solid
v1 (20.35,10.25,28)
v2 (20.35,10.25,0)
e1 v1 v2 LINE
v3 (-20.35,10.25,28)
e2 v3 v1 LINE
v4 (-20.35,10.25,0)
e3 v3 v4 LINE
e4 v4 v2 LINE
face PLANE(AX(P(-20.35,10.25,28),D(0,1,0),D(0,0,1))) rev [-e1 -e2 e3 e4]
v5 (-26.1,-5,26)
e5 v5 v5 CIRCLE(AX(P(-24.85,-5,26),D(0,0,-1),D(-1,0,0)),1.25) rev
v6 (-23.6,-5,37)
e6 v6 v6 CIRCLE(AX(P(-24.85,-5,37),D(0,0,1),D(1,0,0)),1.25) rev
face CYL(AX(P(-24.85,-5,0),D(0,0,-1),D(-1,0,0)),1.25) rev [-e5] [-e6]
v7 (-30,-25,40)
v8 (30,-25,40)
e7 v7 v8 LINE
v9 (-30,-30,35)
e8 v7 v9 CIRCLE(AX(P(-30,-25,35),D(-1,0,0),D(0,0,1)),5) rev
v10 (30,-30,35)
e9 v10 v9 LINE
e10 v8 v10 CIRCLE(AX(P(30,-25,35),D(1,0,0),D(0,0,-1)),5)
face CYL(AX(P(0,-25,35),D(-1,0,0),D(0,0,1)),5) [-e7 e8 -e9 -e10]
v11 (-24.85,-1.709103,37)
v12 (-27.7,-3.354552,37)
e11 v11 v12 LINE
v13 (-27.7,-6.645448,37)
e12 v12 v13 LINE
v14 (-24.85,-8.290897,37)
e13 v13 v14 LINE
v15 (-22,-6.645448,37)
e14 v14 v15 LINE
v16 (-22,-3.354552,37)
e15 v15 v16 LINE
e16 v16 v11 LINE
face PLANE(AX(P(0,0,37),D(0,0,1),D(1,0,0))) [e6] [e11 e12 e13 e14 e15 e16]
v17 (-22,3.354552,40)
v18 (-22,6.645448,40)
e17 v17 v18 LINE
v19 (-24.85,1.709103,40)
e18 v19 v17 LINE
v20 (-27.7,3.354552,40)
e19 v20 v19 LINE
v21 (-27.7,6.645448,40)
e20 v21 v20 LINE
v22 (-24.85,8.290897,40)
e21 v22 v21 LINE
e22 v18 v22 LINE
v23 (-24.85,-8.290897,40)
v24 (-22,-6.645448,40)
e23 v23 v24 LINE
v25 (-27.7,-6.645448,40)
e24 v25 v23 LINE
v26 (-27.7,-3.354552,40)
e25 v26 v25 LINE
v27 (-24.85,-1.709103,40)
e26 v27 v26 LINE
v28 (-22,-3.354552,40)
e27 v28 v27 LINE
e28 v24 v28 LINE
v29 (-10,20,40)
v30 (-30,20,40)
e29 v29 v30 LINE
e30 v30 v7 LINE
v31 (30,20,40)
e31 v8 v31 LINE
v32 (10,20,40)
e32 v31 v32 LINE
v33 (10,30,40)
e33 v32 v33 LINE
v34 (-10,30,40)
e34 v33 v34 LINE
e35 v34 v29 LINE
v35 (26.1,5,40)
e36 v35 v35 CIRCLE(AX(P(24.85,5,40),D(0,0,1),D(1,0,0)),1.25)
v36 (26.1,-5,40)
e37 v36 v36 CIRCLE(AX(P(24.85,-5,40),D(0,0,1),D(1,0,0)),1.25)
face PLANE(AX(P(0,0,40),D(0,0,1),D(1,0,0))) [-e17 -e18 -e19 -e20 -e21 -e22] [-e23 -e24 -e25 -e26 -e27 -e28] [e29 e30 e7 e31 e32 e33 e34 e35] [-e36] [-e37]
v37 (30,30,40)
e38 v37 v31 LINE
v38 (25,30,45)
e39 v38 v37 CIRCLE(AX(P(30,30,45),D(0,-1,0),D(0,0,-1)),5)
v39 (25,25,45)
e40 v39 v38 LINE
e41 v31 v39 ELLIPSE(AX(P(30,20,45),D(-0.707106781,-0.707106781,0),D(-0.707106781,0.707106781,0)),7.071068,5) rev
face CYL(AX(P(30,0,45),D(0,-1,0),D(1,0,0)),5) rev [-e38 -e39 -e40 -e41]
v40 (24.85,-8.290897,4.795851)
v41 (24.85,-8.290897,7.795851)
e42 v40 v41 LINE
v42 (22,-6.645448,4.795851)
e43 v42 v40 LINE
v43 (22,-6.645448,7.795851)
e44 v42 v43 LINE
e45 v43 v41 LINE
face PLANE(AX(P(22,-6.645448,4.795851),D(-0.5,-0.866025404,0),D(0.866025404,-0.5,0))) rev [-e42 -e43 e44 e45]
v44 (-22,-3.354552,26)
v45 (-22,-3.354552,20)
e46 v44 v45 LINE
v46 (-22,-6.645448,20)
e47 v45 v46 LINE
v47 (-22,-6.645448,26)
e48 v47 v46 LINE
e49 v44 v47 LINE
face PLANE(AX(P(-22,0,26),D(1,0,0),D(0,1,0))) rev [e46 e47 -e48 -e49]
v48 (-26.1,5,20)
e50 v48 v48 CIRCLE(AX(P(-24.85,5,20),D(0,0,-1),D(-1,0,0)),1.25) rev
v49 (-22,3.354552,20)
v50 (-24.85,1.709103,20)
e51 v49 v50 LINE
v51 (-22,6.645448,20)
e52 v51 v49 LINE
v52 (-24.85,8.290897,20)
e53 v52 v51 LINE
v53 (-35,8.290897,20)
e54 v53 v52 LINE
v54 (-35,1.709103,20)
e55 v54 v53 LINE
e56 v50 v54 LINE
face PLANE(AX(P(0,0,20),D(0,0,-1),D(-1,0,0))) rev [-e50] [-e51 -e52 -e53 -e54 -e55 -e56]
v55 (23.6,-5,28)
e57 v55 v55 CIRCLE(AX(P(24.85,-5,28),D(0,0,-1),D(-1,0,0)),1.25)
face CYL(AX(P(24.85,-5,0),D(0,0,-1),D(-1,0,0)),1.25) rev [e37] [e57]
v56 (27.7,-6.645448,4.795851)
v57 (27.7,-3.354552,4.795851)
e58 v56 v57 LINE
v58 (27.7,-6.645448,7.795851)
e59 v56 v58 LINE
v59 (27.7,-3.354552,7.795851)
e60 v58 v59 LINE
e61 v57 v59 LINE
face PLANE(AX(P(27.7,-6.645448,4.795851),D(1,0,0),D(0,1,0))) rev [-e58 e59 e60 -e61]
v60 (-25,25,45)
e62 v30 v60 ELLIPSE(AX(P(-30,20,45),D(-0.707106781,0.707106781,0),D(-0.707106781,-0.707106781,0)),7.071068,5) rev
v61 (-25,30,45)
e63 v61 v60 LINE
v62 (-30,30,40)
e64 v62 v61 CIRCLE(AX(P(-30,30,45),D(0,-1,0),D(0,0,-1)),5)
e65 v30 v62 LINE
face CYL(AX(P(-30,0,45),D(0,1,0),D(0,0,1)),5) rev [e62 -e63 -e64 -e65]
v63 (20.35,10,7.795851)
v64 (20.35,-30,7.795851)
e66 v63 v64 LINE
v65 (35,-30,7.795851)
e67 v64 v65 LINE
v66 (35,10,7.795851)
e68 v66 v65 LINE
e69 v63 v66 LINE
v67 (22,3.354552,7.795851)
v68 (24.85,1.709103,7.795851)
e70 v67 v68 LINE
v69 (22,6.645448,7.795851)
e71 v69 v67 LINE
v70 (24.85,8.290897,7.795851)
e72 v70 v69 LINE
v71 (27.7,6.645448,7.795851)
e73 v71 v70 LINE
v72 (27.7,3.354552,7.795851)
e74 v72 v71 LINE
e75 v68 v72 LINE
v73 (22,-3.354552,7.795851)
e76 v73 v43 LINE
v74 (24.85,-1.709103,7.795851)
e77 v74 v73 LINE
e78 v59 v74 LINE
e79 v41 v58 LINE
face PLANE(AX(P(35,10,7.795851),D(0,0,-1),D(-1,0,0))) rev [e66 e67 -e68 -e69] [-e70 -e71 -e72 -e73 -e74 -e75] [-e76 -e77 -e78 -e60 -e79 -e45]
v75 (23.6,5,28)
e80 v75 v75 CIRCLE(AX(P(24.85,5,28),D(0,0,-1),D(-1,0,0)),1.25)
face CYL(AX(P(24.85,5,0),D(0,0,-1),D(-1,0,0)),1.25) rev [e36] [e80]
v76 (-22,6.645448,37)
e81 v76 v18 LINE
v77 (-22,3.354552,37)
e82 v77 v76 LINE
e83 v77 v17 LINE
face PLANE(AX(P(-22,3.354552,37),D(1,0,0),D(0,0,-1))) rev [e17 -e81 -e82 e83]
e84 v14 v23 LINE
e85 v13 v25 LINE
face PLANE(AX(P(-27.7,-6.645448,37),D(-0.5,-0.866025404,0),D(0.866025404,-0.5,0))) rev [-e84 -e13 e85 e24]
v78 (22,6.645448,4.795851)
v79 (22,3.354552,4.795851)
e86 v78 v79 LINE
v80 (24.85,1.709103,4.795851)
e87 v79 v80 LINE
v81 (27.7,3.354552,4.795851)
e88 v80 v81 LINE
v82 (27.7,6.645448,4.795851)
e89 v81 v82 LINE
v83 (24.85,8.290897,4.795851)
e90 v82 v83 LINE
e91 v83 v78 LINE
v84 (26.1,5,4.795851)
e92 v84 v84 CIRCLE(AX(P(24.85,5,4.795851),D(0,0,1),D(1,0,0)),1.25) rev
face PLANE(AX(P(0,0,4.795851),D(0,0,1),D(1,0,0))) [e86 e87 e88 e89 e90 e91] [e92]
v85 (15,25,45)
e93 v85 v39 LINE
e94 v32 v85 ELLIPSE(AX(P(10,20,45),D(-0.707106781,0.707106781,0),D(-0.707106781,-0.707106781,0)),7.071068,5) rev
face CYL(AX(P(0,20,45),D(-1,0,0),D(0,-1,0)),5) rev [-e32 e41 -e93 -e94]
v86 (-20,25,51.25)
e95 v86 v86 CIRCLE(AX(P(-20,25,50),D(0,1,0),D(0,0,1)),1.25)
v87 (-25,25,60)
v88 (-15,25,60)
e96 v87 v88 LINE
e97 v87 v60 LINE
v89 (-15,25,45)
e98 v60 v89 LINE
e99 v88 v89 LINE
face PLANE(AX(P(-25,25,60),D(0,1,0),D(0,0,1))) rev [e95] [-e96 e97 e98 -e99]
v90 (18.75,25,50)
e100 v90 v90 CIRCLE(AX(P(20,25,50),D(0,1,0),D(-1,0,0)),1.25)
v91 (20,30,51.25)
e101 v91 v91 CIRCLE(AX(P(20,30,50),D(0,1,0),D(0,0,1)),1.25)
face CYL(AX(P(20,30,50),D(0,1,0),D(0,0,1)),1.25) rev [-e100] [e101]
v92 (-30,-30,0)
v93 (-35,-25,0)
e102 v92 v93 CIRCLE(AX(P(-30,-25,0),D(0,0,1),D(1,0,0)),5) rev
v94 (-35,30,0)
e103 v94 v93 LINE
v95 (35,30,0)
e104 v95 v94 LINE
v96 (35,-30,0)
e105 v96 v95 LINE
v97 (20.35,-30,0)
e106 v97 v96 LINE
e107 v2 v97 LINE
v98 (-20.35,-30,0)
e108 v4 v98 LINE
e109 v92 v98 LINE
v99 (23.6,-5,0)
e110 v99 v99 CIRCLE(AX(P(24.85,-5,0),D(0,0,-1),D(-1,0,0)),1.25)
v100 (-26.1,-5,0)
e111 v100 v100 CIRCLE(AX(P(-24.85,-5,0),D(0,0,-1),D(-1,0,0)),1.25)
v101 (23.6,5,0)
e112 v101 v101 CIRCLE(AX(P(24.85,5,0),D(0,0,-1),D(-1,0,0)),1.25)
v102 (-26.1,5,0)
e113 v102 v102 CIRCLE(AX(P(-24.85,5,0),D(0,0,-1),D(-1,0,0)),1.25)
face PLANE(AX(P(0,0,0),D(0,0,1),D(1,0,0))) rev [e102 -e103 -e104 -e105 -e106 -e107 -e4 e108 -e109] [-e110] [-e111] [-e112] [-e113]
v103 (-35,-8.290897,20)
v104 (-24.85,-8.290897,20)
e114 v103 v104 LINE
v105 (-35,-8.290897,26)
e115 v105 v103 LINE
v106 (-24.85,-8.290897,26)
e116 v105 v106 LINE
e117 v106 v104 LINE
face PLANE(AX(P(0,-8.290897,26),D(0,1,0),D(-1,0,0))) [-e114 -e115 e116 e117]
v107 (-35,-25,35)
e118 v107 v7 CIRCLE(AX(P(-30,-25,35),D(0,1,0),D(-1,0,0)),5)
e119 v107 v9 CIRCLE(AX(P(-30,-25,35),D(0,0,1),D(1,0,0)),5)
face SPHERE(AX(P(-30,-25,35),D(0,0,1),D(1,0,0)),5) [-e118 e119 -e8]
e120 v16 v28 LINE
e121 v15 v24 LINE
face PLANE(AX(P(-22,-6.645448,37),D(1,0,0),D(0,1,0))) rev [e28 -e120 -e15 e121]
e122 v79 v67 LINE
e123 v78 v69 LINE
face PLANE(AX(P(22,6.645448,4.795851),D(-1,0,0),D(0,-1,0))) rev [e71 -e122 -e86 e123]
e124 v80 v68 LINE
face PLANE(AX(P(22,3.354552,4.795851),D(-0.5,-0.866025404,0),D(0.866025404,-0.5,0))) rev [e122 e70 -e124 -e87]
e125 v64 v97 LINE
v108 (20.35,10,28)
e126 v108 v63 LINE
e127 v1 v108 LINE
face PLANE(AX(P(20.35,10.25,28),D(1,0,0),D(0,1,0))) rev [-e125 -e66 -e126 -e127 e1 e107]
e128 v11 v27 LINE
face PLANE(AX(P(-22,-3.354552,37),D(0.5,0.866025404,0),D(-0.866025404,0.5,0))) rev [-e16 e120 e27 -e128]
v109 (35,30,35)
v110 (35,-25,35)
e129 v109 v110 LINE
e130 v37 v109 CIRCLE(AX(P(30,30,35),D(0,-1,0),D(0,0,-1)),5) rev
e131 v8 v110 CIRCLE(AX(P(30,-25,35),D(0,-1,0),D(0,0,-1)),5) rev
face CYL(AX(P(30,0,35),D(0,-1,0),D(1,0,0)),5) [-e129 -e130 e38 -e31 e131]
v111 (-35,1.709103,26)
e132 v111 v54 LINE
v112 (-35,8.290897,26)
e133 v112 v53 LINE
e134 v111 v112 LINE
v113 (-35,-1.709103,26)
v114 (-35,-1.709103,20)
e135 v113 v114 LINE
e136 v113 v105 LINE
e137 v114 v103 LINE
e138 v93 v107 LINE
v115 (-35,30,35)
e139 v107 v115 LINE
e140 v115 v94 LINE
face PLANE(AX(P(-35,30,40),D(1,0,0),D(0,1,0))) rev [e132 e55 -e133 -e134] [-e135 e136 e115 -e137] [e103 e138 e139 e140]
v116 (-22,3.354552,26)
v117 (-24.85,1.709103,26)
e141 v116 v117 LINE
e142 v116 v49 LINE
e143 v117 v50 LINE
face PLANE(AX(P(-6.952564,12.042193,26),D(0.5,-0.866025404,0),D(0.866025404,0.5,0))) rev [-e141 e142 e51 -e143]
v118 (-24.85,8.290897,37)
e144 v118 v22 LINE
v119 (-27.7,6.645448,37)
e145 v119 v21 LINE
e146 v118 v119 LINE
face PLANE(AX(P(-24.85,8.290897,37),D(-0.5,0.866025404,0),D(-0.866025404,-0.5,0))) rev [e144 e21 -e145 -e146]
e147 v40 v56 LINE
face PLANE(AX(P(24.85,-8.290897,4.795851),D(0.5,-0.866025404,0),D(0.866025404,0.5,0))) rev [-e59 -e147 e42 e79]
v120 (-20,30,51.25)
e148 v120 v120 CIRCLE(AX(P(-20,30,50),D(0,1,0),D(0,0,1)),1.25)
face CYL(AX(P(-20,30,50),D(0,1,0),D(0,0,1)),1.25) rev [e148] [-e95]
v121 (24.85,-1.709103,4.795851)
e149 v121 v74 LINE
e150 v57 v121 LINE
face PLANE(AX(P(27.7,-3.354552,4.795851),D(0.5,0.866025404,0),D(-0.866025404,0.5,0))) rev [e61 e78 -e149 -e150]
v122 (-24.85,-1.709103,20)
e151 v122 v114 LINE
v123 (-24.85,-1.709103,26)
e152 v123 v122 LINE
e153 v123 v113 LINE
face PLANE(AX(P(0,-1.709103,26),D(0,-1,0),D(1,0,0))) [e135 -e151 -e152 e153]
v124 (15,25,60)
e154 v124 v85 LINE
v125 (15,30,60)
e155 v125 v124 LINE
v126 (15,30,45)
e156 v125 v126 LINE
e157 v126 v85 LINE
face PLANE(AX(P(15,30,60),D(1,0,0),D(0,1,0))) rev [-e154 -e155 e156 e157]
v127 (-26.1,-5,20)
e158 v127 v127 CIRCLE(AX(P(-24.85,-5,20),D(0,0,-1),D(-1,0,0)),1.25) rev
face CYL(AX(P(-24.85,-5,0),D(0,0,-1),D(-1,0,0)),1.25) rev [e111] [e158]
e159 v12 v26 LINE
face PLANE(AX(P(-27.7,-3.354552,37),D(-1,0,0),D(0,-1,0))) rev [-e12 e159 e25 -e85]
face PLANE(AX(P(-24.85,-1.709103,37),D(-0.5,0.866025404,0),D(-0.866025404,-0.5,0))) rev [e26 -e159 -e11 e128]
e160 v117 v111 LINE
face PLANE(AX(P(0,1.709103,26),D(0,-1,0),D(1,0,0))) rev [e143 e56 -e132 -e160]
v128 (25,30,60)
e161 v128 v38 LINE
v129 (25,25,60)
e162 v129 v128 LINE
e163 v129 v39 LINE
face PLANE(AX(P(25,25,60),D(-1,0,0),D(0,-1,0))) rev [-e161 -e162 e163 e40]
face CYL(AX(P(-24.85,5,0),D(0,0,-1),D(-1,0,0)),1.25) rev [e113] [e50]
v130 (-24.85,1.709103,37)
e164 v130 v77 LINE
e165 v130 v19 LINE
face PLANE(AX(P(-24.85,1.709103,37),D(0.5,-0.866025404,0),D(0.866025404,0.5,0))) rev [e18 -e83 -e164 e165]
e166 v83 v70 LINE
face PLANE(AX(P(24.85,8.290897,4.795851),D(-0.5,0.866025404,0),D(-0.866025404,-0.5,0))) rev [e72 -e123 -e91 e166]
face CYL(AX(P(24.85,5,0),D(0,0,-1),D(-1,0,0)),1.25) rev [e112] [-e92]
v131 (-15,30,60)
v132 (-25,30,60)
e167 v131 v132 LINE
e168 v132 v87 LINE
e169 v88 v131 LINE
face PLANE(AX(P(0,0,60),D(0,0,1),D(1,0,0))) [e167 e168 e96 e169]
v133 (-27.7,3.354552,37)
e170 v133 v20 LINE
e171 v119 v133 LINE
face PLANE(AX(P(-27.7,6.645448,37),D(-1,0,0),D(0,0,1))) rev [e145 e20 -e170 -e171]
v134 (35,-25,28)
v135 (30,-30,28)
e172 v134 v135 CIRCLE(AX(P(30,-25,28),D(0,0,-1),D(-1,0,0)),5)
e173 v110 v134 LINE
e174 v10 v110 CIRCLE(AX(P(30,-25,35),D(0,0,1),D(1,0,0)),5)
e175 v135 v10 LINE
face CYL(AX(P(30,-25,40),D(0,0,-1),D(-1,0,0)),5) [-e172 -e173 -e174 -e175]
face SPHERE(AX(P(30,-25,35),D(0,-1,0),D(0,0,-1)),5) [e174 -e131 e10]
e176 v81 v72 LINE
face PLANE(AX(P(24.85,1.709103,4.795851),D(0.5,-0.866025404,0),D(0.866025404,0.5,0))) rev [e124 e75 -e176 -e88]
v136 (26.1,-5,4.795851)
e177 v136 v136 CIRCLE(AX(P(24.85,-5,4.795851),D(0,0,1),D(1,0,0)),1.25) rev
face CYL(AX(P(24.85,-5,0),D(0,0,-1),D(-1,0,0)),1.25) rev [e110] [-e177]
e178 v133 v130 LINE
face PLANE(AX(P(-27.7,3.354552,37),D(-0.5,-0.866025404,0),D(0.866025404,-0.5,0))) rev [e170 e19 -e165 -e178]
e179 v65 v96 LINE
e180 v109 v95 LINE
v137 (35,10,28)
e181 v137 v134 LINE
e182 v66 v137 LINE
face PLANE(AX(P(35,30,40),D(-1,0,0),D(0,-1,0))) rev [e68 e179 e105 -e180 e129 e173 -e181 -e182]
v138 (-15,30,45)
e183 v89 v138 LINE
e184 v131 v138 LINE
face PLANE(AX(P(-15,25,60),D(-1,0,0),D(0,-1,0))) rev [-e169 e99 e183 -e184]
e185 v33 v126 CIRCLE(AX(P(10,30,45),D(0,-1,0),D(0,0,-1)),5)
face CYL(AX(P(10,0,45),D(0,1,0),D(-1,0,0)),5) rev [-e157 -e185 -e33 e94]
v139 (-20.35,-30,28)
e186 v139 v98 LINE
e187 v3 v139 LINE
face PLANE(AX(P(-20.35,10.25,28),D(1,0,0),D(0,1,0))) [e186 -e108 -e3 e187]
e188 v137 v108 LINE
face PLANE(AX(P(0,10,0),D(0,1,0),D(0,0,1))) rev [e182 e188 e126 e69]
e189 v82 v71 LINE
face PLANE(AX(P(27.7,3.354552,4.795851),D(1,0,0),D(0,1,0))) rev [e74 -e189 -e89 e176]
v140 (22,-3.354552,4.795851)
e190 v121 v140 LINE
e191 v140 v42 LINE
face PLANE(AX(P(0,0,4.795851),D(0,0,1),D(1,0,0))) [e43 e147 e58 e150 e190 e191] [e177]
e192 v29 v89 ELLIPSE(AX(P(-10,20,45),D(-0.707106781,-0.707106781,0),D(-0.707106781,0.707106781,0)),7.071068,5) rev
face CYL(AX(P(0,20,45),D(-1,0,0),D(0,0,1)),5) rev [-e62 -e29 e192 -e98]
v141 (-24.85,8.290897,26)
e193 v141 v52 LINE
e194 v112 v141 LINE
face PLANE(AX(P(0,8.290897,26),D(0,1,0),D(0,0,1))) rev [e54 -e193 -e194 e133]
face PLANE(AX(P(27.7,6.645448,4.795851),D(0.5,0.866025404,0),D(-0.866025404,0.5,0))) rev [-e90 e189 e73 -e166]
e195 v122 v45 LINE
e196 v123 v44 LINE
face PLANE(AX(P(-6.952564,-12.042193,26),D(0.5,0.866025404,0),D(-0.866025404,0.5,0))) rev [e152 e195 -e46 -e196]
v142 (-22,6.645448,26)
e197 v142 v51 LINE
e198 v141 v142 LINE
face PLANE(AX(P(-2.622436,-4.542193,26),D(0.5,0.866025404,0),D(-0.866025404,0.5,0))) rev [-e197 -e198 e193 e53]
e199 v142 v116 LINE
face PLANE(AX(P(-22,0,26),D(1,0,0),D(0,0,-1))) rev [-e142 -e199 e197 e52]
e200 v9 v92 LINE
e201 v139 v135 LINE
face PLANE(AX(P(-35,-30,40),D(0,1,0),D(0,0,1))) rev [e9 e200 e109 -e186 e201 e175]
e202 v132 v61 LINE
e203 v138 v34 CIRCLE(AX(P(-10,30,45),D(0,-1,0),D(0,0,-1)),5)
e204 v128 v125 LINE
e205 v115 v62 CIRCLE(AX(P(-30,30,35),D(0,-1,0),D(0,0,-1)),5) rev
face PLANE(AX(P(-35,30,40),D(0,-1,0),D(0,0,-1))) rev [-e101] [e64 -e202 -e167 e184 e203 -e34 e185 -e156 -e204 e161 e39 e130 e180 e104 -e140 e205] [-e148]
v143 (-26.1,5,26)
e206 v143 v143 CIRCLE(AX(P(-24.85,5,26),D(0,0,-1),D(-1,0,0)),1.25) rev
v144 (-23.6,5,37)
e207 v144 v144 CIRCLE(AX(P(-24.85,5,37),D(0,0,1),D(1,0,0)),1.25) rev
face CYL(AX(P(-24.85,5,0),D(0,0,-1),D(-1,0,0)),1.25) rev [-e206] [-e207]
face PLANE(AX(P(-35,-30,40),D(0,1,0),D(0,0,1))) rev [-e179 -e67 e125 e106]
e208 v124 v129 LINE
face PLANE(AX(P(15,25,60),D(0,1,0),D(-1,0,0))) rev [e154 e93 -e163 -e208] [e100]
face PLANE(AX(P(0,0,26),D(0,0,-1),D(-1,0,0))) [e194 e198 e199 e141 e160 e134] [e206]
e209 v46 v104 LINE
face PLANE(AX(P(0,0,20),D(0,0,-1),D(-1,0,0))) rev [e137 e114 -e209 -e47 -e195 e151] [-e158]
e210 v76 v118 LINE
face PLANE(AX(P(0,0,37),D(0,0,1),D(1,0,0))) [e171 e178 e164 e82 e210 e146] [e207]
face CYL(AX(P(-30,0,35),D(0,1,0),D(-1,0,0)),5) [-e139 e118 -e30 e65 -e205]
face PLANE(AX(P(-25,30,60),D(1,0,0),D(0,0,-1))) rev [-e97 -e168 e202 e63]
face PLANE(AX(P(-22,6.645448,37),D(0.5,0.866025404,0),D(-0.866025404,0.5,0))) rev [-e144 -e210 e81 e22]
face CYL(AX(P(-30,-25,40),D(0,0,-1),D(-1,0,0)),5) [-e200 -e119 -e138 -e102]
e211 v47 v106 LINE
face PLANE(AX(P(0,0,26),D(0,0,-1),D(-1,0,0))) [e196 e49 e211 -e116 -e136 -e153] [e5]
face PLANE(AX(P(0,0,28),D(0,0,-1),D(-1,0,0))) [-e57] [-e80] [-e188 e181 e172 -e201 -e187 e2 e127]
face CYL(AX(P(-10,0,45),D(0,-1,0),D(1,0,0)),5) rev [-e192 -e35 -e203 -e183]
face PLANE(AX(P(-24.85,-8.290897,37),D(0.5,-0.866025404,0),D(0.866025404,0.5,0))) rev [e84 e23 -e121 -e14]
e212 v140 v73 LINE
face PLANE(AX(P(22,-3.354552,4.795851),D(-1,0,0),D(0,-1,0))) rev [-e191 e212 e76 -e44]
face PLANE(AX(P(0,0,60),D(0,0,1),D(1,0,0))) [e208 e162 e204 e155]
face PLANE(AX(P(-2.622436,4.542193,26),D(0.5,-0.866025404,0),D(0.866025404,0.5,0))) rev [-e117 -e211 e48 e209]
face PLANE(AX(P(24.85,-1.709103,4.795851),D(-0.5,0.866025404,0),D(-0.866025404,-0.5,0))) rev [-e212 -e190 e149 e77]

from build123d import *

# Parameters (mm, degrees)
SKETCH_2_W           = 70
SKETCH_2_H           = 60
EXTRUDE_2_DEPTH      = 40
SKETCH_3_W           = 40.7
SKETCH_3_H           = 20.5
CUT_EXTRUDE_1_DEPTH  = 28
SKETCH_4_W           = 14.65
SKETCH_4_H           = 20.5
EXTRUDE_3_DEPTH      = 28
SKETCH_8_W           = 10
SKETCH_8_H           = 5
EXTRUDE_5_DEPTH      = 60
SKETCH_15_W          = 40.7
SKETCH_15_H          = 40.25
CUT_EXTRUDE_6_DEPTH  = 28
SKETCH_16_W          = 14.65
SKETCH_16_H          = 20.204149113
CUT_EXTRUDE_7_DEPTH  = 40
M3X0_5_1_D           = 2.5
FILLET_1_R           = 5
FILLET_2_R           = 5
FILLET_3_R           = 5
M3X0_5_2_D           = 2.5
CUT_EXTRUDE_8_DEPTH  = 3
CUT_EXTRUDE_9_DEPTH  = 3
CUT_EXTRUDE_10_DEPTH = 6


# Some blends are built 0.0001 mm under size
with BuildPart() as part:
    # ｽｹｯﾁ2 → ﾎﾞｽ - 押し出し2 (new body)
    with BuildSketch(Plane.XY):
        Rectangle(SKETCH_2_W, SKETCH_2_H)
    extrude(amount=EXTRUDE_2_DEPTH)

    # ｽｹｯﾁ3 → ｶｯﾄ - 押し出し1 (cut)
    with BuildSketch(Plane.XY):
        Rectangle(SKETCH_3_W, SKETCH_3_H)
    extrude(amount=CUT_EXTRUDE_1_DEPTH, mode=Mode.SUBTRACT)

    # ｽｹｯﾁ4 → ﾎﾞｽ - 押し出し3 (add)
    with BuildSketch(Plane.XY):
        with Locations((27.675, 0)):
            Rectangle(SKETCH_4_W, SKETCH_4_H)
    extrude(amount=EXTRUDE_3_DEPTH)

    # ｽｹｯﾁ8 → ﾎﾞｽ - 押し出し5 (add)
    with BuildSketch(Plane.XY):
        with Locations((-20, 27.5)):
            Rectangle(SKETCH_8_W, SKETCH_8_H)
        with Locations((20, 27.5)):
            Rectangle(SKETCH_8_W, SKETCH_8_H)
    extrude(amount=EXTRUDE_5_DEPTH)

    # ｽｹｯﾁ15 → ｶｯﾄ - 押し出し6 (cut)
    with BuildSketch(Plane.XY):
        with Locations((0, -9.875)):
            Rectangle(SKETCH_15_W, SKETCH_15_H)
    extrude(amount=CUT_EXTRUDE_6_DEPTH, mode=Mode.SUBTRACT)

    # ｽｹｯﾁ16 → ｶｯﾄ - 押し出し7 (cut)
    with BuildSketch(Plane(origin=(0, -30, 0), x_dir=(-1, 0, 0), z_dir=(0, -1, 0))):
        with Locations((-27.675, -17.897925444)):
            Rectangle(SKETCH_16_W, SKETCH_16_H)
    extrude(amount=-CUT_EXTRUDE_7_DEPTH, mode=Mode.SUBTRACT)

    # M3x0.5 ねじ穴1 (through all)
    with Locations(Plane(origin=(0, 30, 0), x_dir=(1, 0, 0), z_dir=(0, 1, 0))):
        with Locations((-20, -50), (20, -50)):
            Hole(M3X0_5_1_D / 2)

    # ﾌｨﾚｯﾄ1
    fillet_1_edges = [part.edges().sort_by_distance(p)[0] for p in [
        (-15, 27.5, 40),
        (-20, 25, 40),
        (-25, 27.5, 40),
        (20, 25, 40),
        (15, 27.5, 40),
        (25, 27.5, 40),
    ]]
    fillet(fillet_1_edges, radius=FILLET_1_R)

    # ﾌｨﾚｯﾄ2
    fillet_2_edges = [part.edges().sort_by_distance(p)[0] for p in [
        (35, 0, 40),
        (35, -30, 34),
        (0, -30, 40),
        (-35, 0, 40),
    ]]
    fillet(fillet_2_edges, radius=FILLET_2_R - 0.0001)  # a hair under: the kernel refuses the full size

    # ﾌｨﾚｯﾄ3
    # the kernel refuses this fillet: 5 mm, written as the material it takes off along each edge
    with BuildSketch(Plane(origin=(-30, -25, 40), x_dir=(-1, 0, 0), z_dir=(0, 1, 0))) as fillet_3_piece_1:
        with BuildLine():
            CenterArc((0.0001, -4.9999), 4.9999, 0, 90)
            Line((5, -4.9999), (5, 0))
            Line((5, 0), (0.0001, 0))
        make_face()
    revolve(axis=Axis((-30, -25, 40), (0, 0, 1)), revolution_arc=90, mode=Mode.SUBTRACT)
    with BuildSketch(Plane(origin=(-35, -30, -12.5), x_dir=(0, 1, 0), z_dir=(0, 0, 1))) as fillet_3_piece_2:
        with BuildLine():
            CenterArc((FILLET_3_R, -FILLET_3_R), FILLET_3_R, 90, 90)
            Line((0, -FILLET_3_R), (0, 0))
            Line((0, 0), (FILLET_3_R, 0))
        make_face()
    extrude(amount=52.5, mode=Mode.SUBTRACT)

    # M3x0.5 ねじ穴2 (through all)
    with Locations(Plane(origin=(0, 0, 0), x_dir=(-1, 0, 0), z_dir=(0, 0, -1))):
        with Locations((24.85, 5), (24.85, -5)):
            m3x0_5_2 = Hole(M3X0_5_2_D / 2)

    # ﾐﾗｰ1: M3x0.5 ねじ穴2 across plane
    add(m3x0_5_2.mirror(Plane(origin=(0, 0, 0), x_dir=(0, 0, 1), z_dir=(1, 0, 0))), mode=Mode.SUBTRACT)

    # ｽｹｯﾁ17 → ｶｯﾄ - 押し出し8 (cut)
    with BuildSketch(Plane.XY.offset(40)):
        Polygon((-24.85, 8.290896534), (-27.7, 6.645448267), (-27.7, 3.354551733), (-24.85, 1.709103466), (-22, 3.354551733), (-22, 6.645448267), align=None)
        Polygon((-22, -6.645448267), (-22, -3.354551733), (-24.85, -1.709103466), (-27.7, -3.354551733), (-27.7, -6.645448267), (-24.85, -8.290896534), align=None)
    extrude(amount=-CUT_EXTRUDE_8_DEPTH, mode=Mode.SUBTRACT)

    # ｽｹｯﾁ18 → ｶｯﾄ - 押し出し9 (cut)
    with BuildSketch(Plane.XY.offset(7.795850887)):
        Polygon((27.7, 3.354551733), (27.7, 6.645448267), (24.85, 8.290896534), (22, 6.645448267), (22, 3.354551733), (24.85, 1.709103466), align=None)
        Polygon((27.7, -6.645448267), (27.7, -3.354551733), (24.85, -1.709103466), (22, -3.354551733), (22, -6.645448267), (24.85, -8.290896534), align=None)
    extrude(amount=-CUT_EXTRUDE_9_DEPTH, mode=Mode.SUBTRACT)

    # ｽｹｯﾁ19 → ｶｯﾄ - 押し出し10 (cut)
    with BuildSketch(Plane(origin=(0, 0, 20), x_dir=(-1, 0, 0), z_dir=(0, 0, -1))):
        Polygon((35, 1.709103466), (35, 8.290896534), (24.85, 8.290896534), (27.7, 6.645448267), (27.7, 3.354551733), (24.85, 1.709103466), align=None)
        Polygon((22, 6.645448267), (22, 3.354551733), (24.85, 1.709103466), (27.7, 3.354551733), (27.7, 6.645448267), (24.85, 8.290896534), align=None)
        Polygon((22, -6.645448267), (24.85, -8.290896534), (27.7, -6.645448267), (27.7, -3.354551733), (24.85, -1.709103466), (22, -3.354551733), align=None)
        Polygon((35, -8.290896534), (24.85, -8.290896534), (27.7, -6.645448267), (27.7, -3.354551733), (24.85, -1.709103466), (35, -1.709103466), align=None)
    extrude(amount=-CUT_EXTRUDE_10_DEPTH, mode=Mode.SUBTRACT)


solid = part.part
